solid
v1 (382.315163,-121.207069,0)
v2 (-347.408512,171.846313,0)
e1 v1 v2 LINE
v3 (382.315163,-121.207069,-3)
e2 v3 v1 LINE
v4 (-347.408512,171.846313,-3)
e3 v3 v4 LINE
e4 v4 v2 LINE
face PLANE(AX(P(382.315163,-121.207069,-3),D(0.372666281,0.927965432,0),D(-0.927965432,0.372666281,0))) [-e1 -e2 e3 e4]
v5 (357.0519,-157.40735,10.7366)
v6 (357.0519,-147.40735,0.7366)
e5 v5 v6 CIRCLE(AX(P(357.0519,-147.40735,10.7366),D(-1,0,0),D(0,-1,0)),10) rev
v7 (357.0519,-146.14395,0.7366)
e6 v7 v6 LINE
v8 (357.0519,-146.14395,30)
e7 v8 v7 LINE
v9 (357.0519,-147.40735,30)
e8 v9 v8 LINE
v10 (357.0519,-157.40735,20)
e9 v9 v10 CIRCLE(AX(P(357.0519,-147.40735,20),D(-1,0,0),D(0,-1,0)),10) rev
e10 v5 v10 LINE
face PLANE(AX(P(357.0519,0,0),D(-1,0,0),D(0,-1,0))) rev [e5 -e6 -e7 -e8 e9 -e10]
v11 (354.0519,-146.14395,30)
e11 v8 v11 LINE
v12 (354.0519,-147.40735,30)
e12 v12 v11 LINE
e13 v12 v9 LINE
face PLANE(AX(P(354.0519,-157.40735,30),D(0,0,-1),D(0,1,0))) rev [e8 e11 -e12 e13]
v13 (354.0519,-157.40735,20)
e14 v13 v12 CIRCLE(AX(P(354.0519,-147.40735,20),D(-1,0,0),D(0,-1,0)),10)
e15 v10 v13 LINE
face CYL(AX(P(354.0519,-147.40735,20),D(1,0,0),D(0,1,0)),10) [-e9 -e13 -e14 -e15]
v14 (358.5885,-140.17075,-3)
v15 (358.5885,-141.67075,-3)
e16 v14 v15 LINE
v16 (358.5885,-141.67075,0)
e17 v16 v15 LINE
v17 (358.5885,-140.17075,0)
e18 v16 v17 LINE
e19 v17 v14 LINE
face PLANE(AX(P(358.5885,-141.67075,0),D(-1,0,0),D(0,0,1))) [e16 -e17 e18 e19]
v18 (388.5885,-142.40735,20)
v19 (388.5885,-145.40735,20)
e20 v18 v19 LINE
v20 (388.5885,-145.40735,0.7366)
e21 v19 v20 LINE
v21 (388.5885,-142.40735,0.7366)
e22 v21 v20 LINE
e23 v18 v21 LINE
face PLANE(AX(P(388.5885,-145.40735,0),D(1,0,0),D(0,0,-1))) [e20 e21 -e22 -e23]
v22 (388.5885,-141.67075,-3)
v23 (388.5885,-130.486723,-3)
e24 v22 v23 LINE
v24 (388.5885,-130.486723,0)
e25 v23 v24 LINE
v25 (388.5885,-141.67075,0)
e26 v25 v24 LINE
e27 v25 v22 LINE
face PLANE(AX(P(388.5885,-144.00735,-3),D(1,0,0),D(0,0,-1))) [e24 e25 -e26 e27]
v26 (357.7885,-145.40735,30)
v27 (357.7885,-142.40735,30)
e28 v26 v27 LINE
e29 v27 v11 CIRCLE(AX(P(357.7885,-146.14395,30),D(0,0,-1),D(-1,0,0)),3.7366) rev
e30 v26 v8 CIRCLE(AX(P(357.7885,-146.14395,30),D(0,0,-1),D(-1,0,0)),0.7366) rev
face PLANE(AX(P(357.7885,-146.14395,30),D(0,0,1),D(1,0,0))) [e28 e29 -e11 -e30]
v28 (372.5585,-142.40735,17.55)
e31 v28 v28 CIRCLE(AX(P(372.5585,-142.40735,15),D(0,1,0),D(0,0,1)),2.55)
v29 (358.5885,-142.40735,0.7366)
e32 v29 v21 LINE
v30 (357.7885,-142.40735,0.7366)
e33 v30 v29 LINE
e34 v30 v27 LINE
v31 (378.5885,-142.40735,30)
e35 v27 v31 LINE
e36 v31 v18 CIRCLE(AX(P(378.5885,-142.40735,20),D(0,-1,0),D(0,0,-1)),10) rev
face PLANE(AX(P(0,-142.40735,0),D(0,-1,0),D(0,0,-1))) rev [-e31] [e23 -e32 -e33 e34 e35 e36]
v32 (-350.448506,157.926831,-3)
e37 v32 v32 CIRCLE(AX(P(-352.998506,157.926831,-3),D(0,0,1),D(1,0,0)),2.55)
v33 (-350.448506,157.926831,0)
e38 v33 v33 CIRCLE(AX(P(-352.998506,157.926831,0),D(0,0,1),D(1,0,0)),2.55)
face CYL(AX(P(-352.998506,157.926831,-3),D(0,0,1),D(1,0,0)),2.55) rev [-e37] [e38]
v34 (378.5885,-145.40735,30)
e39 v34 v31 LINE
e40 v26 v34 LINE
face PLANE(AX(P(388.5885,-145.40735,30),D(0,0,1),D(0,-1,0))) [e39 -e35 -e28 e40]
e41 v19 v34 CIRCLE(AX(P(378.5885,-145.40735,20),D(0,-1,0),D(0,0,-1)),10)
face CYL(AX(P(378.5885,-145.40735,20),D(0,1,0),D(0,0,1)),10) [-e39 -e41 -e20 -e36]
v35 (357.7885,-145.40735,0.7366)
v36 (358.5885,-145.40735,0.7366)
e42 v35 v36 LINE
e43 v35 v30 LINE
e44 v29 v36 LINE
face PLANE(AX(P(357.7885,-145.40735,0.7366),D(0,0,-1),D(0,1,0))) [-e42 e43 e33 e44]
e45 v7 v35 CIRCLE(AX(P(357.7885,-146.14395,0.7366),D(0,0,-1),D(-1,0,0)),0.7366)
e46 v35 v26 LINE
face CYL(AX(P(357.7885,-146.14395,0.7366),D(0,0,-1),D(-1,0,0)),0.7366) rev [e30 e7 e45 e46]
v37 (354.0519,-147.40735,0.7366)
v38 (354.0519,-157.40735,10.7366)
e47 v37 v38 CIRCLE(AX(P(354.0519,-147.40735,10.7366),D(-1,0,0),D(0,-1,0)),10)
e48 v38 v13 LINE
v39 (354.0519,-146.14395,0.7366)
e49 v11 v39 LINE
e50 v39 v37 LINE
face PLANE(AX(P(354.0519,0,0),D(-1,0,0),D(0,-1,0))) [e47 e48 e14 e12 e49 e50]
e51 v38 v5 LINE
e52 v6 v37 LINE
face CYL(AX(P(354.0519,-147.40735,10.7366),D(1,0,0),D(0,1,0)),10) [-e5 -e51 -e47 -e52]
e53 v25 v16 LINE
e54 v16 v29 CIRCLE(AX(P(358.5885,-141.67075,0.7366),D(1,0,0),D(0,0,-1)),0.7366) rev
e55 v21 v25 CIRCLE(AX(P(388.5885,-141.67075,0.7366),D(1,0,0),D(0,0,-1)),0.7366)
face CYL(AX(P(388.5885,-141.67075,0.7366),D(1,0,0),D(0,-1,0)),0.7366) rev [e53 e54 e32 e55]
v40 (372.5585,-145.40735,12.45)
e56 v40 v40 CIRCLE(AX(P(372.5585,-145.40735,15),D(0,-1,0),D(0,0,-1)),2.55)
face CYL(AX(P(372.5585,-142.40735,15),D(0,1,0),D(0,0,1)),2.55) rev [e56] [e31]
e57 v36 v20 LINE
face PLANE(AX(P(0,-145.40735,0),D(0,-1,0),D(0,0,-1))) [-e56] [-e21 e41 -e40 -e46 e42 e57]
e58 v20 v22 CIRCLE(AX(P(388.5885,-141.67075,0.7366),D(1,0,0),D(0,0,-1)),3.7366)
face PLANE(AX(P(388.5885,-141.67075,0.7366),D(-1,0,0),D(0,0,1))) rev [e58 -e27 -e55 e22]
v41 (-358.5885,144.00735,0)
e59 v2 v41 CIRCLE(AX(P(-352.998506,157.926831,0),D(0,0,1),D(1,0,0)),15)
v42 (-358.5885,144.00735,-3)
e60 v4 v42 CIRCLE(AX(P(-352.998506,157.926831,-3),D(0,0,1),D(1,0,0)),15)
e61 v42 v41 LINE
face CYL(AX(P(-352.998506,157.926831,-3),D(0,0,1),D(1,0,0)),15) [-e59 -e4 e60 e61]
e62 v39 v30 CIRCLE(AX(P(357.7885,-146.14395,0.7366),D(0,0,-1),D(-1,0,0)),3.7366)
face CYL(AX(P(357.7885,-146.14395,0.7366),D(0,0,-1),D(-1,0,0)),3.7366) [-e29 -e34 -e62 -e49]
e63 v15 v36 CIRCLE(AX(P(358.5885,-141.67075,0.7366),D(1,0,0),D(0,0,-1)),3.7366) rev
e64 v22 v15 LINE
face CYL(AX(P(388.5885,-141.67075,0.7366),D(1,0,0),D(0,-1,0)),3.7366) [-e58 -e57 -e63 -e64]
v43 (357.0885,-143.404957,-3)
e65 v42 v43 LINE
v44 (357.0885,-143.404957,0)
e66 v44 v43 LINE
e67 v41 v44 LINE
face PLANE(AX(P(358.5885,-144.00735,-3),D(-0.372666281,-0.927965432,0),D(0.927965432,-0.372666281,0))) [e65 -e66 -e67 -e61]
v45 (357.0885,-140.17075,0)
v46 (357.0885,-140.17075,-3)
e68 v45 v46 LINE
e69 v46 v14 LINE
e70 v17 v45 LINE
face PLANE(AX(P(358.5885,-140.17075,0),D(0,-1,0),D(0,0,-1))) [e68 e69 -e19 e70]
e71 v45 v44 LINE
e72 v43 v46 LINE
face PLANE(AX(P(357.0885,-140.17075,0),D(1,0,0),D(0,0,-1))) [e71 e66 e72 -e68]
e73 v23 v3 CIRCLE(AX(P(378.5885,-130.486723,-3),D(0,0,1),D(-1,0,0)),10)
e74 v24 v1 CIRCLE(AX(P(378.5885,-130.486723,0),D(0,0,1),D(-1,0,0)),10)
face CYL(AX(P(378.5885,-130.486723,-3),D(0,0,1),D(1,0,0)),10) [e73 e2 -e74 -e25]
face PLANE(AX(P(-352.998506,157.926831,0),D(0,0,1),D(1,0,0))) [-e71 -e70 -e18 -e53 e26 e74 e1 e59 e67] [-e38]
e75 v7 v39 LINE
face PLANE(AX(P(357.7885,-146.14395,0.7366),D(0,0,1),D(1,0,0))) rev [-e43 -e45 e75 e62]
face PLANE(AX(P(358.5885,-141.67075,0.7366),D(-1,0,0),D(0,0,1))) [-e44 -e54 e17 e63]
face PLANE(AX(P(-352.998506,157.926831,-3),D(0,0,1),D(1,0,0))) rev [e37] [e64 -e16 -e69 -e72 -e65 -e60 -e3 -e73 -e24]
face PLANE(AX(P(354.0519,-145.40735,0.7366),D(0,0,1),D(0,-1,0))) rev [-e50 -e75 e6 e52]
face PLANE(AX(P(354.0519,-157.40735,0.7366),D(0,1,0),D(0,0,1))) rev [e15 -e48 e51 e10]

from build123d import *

# Parameters (mm, degrees)
SKETCH1_R                      = 2.55
BASE_FLANGE1_DEPTH             = 3
EDGE_FLANGE1_STRIP_W           = 14.8732
EDGE_FLANGE1_STRIP_H           = 3
EDGE_FLANGE1_STRIP_CUT_DEPTH   = 30
EDGE_FLANGE1_RELIEF_W          = 16.3732
EDGE_FLANGE1_RELIEF_H          = 1.5
EDGE_FLANGE1_RELIEF_CUT_DEPTH  = 3
EDGE_FLANGE1_DEPTH             = 30
EDGE_FLANGE2_DEPTH             = 29.2634
FILLET1_R                      = 10
F_5_1_5_1_DIAMETER_HOLE1_D     = 5.1
F_5_1_5_1_DIAMETER_HOLE1_DEPTH = 10
F_5_1_5_1_DIAMETER_HOLE1_TIP   = 1.532194579


# Sheet-metal steps are written as plain solids
with BuildPart() as part:
    # Sketch1 → Base-Flange1 (new body)
    with BuildSketch(Plane.XY):
        with BuildLine():
            Line((358.5885, -144.00735), (-358.5885, 144.00735))
            ThreePointArc((-358.5885, 144.00735), (-366.917987263, 163.516825696), (-347.408511566, 171.846312959))
            Line((-347.408511566, 171.846312959), (382.315162811, -121.207068785))
            ThreePointArc((382.315162811, -121.207068785), (386.873022561, -124.886126177), (388.5885, -130.486723104))
            Line((388.5885, -130.486723104), (388.5885, -144.00735))
            Line((388.5885, -144.00735), (358.5885, -144.00735))
        make_face()
        with Locations((-352.998505783, 157.926831479)):
            Circle(SKETCH1_R, mode=Mode.SUBTRACT)
    extrude(amount=-BASE_FLANGE1_DEPTH)

    # Edge-Flange1 strip (across the edge) → Edge-Flange1 strip cut (cut)
    with BuildSketch(Plane(origin=(358.5885, -145.40735, 0), x_dir=(0, 1, 0), z_dir=(1, 0, 0))):
        with Locations((-3.7, -1.5)):
            Rectangle(EDGE_FLANGE1_STRIP_W, EDGE_FLANGE1_STRIP_H)
    extrude(amount=EDGE_FLANGE1_STRIP_CUT_DEPTH, mode=Mode.SUBTRACT)

    # Edge-Flange1 relief (on the sheet) → Edge-Flange1 relief cut (cut)
    with BuildSketch(Plane(origin=(358.5885, -141.67075, 0), x_dir=(0, 1, 0), z_dir=(0, 0, 1))):
        with Locations((-6.6866, 0.75)):
            Rectangle(EDGE_FLANGE1_RELIEF_W, EDGE_FLANGE1_RELIEF_H)
    extrude(amount=-EDGE_FLANGE1_RELIEF_CUT_DEPTH, mode=Mode.SUBTRACT)

    # Edge-Flange1 section (across the edge) → Edge-Flange1 (add)
    with BuildSketch(Plane(origin=(358.5885, -145.40735, 0), x_dir=(0, 1, 0), z_dir=(1, 0, 0))):
        with BuildLine():
            Line((0, 0.7366), (0, 30))
            Line((0, 30), (3, 30))
            Line((3, 30), (3, 0.7366))
            ThreePointArc((3, 0.7366), (3.215745145, 0.215745145), (3.7366, 0))
            Line((3.7366, 0), (3.7366, -3))
            ThreePointArc((3.7366, -3), (1.094424801, -1.905575199), (0, 0.7366))
        make_face()
    extrude(amount=EDGE_FLANGE1_DEPTH)

    # Edge-Flange2 section (across the edge) → Edge-Flange2 (add)
    with BuildSketch(Plane(origin=(357.0519, -145.40735, 30), x_dir=(1, 0, 0), z_dir=(0, 0, -1))):
        with BuildLine():
            Line((-3, 0.7366), (-3, 12))
            Line((-3, 12), (0, 12))
            Line((0, 12), (0, 0.7366))
            ThreePointArc((0, 0.7366), (0.215745145, 0.215745145), (0.7366, 0))
            Line((0.7366, 0), (1.5366, 0))
            Line((1.5366, 0), (1.5366, -3))
            Line((1.5366, -3), (0.7366, -3))
            ThreePointArc((0.7366, -3), (-1.905575199, -1.905575199), (-3, 0.7366))
        make_face()
    extrude(amount=EDGE_FLANGE2_DEPTH)

    # Fillet1
    fillet1_edges = [part.edges().sort_by_distance(p)[0] for p in [
        (388.5885, -143.90735, 30),
        (355.5519, -157.40735, 30),
        (355.5519, -157.40735, 0.7366),
    ]]
    fillet(fillet1_edges, radius=FILLET1_R)

    # Ø5.1 (5.1) Diameter Hole1
    with Locations(Plane(origin=(0, -142.40735, 0), x_dir=(1, 0, 0), z_dir=(0, 1, 0))):
        with Locations((372.5585, -15)):
            Hole(F_5_1_5_1_DIAMETER_HOLE1_D / 2, depth=F_5_1_5_1_DIAMETER_HOLE1_DEPTH)
            with Locations((0, 0, -(F_5_1_5_1_DIAMETER_HOLE1_DEPTH + F_5_1_5_1_DIAMETER_HOLE1_TIP / 2))):  # 118° drill point
                Cone(0, F_5_1_5_1_DIAMETER_HOLE1_D / 2, F_5_1_5_1_DIAMETER_HOLE1_TIP, mode=Mode.SUBTRACT)


solid = part.part
